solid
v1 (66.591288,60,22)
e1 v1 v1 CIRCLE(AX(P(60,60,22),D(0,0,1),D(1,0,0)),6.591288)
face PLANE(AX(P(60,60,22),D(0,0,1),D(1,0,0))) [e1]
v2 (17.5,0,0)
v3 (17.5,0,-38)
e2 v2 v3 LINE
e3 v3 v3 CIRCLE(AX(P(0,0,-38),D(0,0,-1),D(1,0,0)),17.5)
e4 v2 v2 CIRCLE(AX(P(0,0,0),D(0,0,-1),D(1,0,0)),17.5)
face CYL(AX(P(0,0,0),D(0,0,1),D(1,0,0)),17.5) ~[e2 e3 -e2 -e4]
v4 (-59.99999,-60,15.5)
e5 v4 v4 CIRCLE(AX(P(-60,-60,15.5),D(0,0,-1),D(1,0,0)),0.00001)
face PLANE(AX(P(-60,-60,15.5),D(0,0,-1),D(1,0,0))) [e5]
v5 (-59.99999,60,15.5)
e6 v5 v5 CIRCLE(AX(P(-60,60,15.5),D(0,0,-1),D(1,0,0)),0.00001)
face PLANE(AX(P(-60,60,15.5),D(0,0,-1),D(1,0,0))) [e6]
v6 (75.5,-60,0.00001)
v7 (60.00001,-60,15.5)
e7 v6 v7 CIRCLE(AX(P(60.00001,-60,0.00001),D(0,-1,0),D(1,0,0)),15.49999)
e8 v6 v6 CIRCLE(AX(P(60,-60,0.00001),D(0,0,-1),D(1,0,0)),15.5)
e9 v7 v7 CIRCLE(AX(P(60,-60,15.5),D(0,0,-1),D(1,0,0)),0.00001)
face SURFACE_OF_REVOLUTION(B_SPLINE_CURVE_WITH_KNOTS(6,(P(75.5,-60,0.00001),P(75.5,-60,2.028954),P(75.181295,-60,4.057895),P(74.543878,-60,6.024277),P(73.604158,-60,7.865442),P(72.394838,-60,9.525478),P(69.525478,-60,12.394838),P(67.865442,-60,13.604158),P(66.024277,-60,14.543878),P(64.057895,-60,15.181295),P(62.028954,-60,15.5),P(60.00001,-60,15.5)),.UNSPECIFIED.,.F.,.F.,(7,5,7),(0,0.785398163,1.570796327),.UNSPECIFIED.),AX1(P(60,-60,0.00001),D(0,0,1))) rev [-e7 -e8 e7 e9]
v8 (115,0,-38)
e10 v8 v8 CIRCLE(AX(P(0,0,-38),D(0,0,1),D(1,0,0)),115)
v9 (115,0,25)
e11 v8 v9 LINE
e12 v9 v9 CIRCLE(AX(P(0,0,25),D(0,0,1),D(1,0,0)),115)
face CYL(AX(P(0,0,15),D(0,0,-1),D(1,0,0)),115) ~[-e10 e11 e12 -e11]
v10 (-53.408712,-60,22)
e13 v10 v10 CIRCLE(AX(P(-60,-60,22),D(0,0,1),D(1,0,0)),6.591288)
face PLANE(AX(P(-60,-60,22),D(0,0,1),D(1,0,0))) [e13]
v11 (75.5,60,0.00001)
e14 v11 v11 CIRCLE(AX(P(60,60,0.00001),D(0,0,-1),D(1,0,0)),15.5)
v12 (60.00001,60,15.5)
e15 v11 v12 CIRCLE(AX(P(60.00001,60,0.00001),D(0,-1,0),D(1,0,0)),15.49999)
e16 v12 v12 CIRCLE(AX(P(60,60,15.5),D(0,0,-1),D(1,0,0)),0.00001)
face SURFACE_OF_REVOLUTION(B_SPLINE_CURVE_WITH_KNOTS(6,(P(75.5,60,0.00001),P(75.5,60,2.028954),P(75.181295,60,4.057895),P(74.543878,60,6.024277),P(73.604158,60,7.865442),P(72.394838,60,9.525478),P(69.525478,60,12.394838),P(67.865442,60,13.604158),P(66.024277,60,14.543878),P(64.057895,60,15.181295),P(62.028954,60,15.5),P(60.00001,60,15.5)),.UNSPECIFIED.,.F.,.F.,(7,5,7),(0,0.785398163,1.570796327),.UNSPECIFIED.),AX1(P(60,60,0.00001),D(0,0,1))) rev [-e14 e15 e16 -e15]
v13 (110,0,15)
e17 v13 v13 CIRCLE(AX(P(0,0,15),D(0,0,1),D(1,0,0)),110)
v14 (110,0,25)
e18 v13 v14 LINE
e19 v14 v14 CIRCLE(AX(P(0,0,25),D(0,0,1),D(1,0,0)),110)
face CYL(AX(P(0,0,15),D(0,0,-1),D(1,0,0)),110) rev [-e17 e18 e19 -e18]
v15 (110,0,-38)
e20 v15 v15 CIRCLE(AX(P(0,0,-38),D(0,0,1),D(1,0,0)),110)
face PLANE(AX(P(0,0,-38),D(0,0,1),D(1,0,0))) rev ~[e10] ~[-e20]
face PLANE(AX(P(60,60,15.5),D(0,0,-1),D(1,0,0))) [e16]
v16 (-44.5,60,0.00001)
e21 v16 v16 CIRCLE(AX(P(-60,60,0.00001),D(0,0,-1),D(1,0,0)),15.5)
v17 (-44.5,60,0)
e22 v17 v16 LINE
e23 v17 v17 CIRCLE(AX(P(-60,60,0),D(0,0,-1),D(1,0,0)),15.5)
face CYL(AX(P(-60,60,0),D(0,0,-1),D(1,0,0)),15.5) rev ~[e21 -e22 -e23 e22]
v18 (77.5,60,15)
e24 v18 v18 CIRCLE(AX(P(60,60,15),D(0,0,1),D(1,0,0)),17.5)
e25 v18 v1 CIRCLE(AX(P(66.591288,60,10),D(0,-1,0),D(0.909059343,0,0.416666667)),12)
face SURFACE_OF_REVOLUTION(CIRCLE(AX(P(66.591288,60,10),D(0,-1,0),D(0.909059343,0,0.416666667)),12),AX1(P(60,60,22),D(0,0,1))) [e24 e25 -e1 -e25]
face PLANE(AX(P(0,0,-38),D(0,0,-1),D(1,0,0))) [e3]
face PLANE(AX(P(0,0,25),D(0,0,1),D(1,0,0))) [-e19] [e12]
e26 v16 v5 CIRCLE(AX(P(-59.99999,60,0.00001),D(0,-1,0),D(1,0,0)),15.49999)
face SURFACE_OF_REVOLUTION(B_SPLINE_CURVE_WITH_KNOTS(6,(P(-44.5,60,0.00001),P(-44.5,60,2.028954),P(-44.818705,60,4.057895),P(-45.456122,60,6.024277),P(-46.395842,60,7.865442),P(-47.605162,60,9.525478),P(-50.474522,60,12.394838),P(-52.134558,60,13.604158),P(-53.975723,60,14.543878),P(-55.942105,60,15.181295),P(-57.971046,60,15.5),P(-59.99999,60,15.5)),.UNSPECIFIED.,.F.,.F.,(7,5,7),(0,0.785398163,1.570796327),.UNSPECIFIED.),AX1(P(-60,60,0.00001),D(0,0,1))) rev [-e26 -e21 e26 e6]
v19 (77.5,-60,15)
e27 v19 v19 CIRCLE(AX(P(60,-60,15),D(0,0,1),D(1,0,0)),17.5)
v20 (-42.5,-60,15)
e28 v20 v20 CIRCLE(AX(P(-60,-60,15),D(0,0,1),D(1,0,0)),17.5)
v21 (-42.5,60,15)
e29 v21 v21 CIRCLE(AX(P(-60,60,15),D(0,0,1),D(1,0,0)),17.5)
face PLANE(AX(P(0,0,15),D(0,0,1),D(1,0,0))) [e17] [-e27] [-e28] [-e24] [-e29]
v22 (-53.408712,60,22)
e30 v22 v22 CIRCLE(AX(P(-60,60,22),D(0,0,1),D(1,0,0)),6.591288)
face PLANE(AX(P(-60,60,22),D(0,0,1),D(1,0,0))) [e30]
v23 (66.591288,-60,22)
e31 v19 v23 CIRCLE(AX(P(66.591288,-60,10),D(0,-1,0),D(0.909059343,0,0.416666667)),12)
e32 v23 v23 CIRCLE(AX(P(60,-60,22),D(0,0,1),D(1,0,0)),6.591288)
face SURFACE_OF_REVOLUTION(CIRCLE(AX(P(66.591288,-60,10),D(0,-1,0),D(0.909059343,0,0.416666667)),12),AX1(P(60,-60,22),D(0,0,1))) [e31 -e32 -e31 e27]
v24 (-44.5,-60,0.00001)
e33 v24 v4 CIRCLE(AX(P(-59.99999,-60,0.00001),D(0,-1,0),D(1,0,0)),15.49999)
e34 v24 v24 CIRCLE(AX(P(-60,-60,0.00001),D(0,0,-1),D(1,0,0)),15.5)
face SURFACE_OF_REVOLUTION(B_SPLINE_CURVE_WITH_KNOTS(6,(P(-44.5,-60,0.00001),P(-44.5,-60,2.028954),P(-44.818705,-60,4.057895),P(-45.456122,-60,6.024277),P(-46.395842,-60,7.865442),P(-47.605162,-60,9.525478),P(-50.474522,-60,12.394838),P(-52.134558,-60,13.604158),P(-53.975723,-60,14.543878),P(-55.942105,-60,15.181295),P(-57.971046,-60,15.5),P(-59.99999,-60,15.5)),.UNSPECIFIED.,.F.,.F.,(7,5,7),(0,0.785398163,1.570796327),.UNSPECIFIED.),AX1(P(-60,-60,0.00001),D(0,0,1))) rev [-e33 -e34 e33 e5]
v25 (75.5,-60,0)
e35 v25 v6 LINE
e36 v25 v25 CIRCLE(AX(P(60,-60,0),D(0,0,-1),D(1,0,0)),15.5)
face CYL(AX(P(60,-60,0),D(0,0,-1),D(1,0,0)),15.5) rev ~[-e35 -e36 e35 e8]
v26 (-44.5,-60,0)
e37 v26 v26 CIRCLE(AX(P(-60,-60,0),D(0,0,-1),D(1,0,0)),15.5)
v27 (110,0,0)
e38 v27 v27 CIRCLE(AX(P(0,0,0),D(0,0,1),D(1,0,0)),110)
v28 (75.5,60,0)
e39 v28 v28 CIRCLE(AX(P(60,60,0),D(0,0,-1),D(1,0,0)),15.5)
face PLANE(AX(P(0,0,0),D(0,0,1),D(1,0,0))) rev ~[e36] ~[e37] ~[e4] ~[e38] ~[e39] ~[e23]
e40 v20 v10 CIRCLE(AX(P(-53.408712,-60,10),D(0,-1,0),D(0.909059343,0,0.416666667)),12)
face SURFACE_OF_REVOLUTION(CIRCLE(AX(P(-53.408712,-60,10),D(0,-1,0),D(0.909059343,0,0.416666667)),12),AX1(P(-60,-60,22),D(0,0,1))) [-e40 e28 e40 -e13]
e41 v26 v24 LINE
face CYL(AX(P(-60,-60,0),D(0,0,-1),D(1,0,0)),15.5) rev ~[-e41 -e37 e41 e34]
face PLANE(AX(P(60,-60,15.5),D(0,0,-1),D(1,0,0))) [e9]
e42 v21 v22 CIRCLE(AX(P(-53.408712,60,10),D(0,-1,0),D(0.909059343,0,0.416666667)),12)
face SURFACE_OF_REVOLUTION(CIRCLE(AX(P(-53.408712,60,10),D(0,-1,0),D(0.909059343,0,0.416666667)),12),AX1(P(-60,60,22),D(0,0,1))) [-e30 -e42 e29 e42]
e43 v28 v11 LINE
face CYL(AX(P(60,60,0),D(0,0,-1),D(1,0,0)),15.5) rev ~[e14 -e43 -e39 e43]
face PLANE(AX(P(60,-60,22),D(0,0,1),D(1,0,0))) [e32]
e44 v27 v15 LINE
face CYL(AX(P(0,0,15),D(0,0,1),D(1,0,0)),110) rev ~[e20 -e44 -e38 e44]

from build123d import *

# Parameters (mm, degrees)
F0_R           = 115
F1_DEPTH       = 15
F2_R           = 17.5
F3_DEPTH       = 38
F4_R           = 17.5
F5_DEPTH       = 7
F6_R           = 15.5
F7_DEPTH       = 15.5
F8_R           = 15.49999
F10_R          = 115
F10_R_2        = 110
F11_DEPTH      = 10
F11_DEPTH_BACK = 53


# Not quite as in the source:
# - a fillet or chamfer that OpenCascade refuses, or shapes differently, is made with other operations: its cross-section is extruded or revolved along the edge and cut away or added
# - a fillet or chamfer is up to 0.001 mm smaller than in the source, because OpenCascade refuses the exact size


with BuildPart() as f1:
    # F0 (on Top) → F1 (new body)
    with BuildSketch(Plane.XY):
        Circle(F0_R)
    extrude(amount=F1_DEPTH)

    # F2 (on face) → F3 (join)
    with BuildSketch(Plane(origin=(0, 0, 0), x_dir=(1, 0, 0), z_dir=(0, 0, -1))):
        Circle(F2_R)
    extrude(amount=F3_DEPTH)

    # F4 (on face) → F5 (join)
    with BuildSketch(Plane.XY.offset(15)):
        with Locations((-60, 60)):
            Circle(F4_R)
        with Locations((-60, -60)):
            Circle(F4_R)
        with Locations((60, -60)):
            Circle(F4_R)
        with Locations((60, 60)):
            Circle(F4_R)
    extrude(amount=F5_DEPTH)

    # F6 (on face) → F7 (cut)
    with BuildSketch(Plane(origin=(0, 0, 0), x_dir=(1, 0, 0), z_dir=(0, 0, -1))):
        with Locations((-60, 60)):
            Circle(F6_R)
        with Locations((-60, -60)):
            Circle(F6_R)
        with Locations((60, -60)):
            Circle(F6_R)
        with Locations((60, 60)):
            Circle(F6_R)
    extrude(amount=-F7_DEPTH, mode=Mode.SUBTRACT)

    # F8 (radius 15.5 in the source; OpenCascade refuses exactly that, so slightly less here)
    f8_edges = [f1.edges().sort_by_distance(p)[0] for p in [
        (-75.5, -60, 15.5),
        (44.5, -60, 15.5),
        (44.5, 60, 15.5),
        (-75.5, 60, 15.5),
    ]]
    fillet(f8_edges, radius=F8_R)

    # F9: fillet of radius 12 on 4 edges, made by hand

    # F9_s1 → F9_t2 (revolve, cut)
    with BuildSketch(Plane.XZ.offset(60)):
        with BuildLine():
            ThreePointArc((-42.5, 15), (-46.9279714162, 20.0995049384), (-53.4087121146, 22))
            Line((-53.4087121146, 22), (-42.5, 22))
            Line((-42.5, 22), (-42.5, 15))
        make_face()
    revolve(axis=Axis((-60, -60, 22), (0, 0, 1)), mode=Mode.SUBTRACT)

    # F9_s3 → F9_t4 (revolve, cut)
    with BuildSketch(Plane.XZ.offset(-60)):
        with BuildLine():
            ThreePointArc((-42.5, 15), (-46.9279714162, 20.0995049384), (-53.4087121146, 22))
            Line((-53.4087121146, 22), (-42.5, 22))
            Line((-42.5, 22), (-42.5, 15))
        make_face()
    revolve(axis=Axis((-60, 60, 22), (0, 0, 1)), mode=Mode.SUBTRACT)

    # F9_s5 → F9_t6 (revolve, cut)
    with BuildSketch(Plane.XZ.offset(-60)):
        with BuildLine():
            ThreePointArc((77.5, 15), (73.0720285838, 20.0995049384), (66.5912878854, 22))
            Line((66.5912878854, 22), (77.5, 22))
            Line((77.5, 22), (77.5, 15))
        make_face()
    revolve(axis=Axis((60, 60, 22), (0, 0, 1)), mode=Mode.SUBTRACT)

    # F9_s7 → F9_t8 (revolve, cut)
    with BuildSketch(Plane.XZ.offset(60)):
        with BuildLine():
            ThreePointArc((77.5, 15), (73.0720285838, 20.0995049384), (66.5912878854, 22))
            Line((66.5912878854, 22), (77.5, 22))
            Line((77.5, 22), (77.5, 15))
        make_face()
    revolve(axis=Axis((60, -60, 22), (0, 0, 1)), mode=Mode.SUBTRACT)

    # F10 (on face) → F11 (join, two sides)
    with BuildSketch(Plane.XY.offset(15)) as f11_sk:
        Circle(F10_R)
        Circle(F10_R_2, mode=Mode.SUBTRACT)
    extrude(amount=F11_DEPTH)
    extrude(f11_sk.sketch, amount=-F11_DEPTH_BACK)


solid = f1.part
